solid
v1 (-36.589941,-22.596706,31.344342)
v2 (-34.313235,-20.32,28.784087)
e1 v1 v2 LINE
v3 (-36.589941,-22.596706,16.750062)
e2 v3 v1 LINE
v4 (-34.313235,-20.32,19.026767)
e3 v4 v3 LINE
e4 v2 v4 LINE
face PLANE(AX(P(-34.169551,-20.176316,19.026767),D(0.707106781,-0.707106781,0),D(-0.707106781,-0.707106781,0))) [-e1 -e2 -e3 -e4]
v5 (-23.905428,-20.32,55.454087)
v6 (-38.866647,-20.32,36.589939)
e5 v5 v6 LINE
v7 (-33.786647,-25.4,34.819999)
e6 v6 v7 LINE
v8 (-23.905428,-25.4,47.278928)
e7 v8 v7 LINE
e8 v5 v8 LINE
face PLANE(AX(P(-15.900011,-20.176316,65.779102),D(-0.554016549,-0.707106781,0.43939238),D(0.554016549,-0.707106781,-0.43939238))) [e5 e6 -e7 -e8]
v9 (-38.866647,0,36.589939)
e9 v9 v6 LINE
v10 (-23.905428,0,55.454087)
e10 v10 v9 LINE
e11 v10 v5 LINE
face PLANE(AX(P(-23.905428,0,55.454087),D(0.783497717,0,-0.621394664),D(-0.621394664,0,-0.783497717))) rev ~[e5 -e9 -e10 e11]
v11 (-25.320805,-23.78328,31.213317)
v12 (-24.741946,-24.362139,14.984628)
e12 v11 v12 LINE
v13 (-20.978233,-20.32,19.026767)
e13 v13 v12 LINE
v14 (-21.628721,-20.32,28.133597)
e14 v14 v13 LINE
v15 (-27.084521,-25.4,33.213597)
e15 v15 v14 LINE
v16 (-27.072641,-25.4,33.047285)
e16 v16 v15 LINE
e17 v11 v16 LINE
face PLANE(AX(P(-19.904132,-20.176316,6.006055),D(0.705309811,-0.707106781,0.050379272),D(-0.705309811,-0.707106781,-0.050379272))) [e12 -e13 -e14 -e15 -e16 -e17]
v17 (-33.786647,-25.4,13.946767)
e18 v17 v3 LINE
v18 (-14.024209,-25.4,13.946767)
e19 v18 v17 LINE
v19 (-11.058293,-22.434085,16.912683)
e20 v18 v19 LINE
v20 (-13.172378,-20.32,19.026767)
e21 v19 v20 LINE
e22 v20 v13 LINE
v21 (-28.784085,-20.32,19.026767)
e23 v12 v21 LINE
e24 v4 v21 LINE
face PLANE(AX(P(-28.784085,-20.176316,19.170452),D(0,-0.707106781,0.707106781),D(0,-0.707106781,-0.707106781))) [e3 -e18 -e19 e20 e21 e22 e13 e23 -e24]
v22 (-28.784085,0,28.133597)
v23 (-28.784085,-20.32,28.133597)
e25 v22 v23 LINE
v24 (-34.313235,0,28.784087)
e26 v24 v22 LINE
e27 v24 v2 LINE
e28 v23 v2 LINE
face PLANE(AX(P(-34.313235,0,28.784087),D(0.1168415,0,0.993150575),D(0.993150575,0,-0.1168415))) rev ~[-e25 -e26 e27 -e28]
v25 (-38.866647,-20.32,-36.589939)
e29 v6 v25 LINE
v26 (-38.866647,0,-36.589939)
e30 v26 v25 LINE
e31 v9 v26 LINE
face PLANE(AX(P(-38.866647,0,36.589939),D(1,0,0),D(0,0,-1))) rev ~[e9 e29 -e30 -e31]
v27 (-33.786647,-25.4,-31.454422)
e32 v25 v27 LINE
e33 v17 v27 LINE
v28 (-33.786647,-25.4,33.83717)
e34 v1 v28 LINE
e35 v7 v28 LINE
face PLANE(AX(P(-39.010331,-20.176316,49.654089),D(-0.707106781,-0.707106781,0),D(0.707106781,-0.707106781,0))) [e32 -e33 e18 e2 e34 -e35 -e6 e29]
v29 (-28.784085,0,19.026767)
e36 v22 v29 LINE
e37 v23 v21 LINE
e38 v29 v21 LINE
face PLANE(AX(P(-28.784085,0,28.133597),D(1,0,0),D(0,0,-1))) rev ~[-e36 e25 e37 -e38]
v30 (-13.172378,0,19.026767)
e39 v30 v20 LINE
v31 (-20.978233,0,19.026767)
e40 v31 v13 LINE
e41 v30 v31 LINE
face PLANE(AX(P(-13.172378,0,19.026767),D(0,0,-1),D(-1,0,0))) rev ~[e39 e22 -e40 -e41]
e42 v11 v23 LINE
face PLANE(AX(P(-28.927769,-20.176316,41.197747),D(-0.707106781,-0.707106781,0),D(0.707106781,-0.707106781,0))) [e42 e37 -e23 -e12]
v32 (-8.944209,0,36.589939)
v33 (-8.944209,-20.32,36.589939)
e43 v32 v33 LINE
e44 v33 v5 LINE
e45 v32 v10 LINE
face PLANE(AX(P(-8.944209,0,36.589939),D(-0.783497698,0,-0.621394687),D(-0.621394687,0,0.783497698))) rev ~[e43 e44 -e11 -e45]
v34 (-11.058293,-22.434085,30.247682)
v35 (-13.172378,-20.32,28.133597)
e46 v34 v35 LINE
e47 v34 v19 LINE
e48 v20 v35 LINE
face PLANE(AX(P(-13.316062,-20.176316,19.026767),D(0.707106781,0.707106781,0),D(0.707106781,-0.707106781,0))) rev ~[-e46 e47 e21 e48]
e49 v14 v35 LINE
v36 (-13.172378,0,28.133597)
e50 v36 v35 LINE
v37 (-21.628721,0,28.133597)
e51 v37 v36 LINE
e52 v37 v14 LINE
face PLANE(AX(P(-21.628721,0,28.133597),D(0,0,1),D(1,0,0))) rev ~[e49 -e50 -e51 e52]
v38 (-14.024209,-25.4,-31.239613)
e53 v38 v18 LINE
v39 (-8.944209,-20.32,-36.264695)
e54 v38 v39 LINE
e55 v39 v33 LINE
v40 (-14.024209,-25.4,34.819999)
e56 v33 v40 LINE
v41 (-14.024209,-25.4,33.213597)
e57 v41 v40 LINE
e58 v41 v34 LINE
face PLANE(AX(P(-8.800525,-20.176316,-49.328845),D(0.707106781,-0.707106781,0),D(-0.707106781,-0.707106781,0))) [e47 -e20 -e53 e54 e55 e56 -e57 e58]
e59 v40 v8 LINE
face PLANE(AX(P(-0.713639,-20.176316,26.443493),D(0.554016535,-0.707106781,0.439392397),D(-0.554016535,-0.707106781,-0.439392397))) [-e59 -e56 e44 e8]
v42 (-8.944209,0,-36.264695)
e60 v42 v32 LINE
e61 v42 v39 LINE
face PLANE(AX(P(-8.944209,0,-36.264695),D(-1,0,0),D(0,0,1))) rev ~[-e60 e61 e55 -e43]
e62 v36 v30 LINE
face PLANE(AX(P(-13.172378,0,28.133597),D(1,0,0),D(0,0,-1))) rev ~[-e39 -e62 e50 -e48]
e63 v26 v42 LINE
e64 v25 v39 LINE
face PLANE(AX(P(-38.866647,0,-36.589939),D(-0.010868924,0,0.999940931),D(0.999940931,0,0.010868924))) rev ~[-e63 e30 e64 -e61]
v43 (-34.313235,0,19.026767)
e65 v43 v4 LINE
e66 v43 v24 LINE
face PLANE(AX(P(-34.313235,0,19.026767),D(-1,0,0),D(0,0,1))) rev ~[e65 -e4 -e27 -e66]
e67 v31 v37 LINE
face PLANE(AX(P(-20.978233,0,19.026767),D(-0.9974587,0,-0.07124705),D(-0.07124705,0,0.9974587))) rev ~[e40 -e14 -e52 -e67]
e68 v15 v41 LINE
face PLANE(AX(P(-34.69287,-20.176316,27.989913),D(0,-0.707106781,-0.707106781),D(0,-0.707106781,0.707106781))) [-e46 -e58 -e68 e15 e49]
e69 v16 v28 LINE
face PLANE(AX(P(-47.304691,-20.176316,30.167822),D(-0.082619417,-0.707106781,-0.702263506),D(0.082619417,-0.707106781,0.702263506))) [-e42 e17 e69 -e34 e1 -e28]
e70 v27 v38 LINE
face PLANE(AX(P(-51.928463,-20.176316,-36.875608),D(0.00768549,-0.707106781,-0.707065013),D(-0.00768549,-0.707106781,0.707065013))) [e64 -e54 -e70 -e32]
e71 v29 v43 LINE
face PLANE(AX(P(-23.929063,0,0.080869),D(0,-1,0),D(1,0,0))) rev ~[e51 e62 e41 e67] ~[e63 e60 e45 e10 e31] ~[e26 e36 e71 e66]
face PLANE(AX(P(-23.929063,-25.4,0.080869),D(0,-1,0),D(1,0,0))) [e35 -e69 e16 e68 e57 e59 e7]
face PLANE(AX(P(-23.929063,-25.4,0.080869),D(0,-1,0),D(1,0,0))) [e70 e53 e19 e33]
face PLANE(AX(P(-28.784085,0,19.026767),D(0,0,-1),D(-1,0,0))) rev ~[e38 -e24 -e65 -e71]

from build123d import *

# Parameters (mm, degrees)
F1_DEPTH      = 25.4
F2_T1_DEPTH   = 5.5291503668
F2_T3_DEPTH   = 9.1068297625
F2_T8_DEPTH   = 98.9829335321
F2_T14_DEPTH  = 50.2051374371
F2_T20_DEPTH  = 50.2051368583
F2_T26_DEPTH  = 99.3081774522
F2_T32_DEPTH  = 56.0525045898
F2_T38_DEPTH  = 22.8214690441
F2_T43_DEPTH  = 31.6955822143
F2_T49_DEPTH  = 22.1709793413
F2_T54_DEPTH  = 35.2583310718
F2_T60_DEPTH  = 21.5204924325
F2_T65_DEPTH  = 20.8700045923
F2_T71_DEPTH  = 98.9829335321
F2_T75_DEPTH  = 56.0525045898
F2_T82_DEPTH  = 98.9829335321
F2_T86_DEPTH  = 50.2051374371
F2_T93_DEPTH  = 50.2051374371
F2_T97_DEPTH  = 50.2051368583
F2_T104_DEPTH = 50.2051368583
F2_T108_DEPTH = 99.3081774522
F2_T115_DEPTH = 99.3081774522
F2_T119_DEPTH = 56.0525045898
F2_T126_DEPTH = 35.885618623
F2_T130_DEPTH = 18.5932999456
F2_T137_DEPTH = 22.8214690441
F2_T141_DEPTH = 31.6955822143
F2_T148_DEPTH = 31.6955822143
F2_T152_DEPTH = 22.1709793413
F2_T159_DEPTH = 35.2351289202
F2_T163_DEPTH = 18.5932999456
F2_T170_DEPTH = 35.2583310718
F2_T174_DEPTH = 20.8700045923
F2_T181_DEPTH = 35.2583310718
F2_T185_DEPTH = 21.5204924325
F2_T192_DEPTH = 34.5846420113
F2_T196_DEPTH = 22.1709793413
F2_T203_DEPTH = 22.1709793413
F2_T207_DEPTH = 33.9341541712
F3_R          = 2.4287646607
F4_DEPTH      = 25.4


# Not quite as in the source:
# - a fillet or chamfer that OpenCascade refuses, or shapes differently, is made with other operations: its cross-section is extruded or revolved along the edge and cut away or added


with BuildPart() as f1:
    # F0 (on Front) → F1 (new body)
    with BuildSketch(Plane.XZ):
        Polygon((-38.8666465878, 36.5899391472), (-38.8666465878, -36.5899391472), (-8.9442087337, -36.2646952271), (-8.9442087337, 36.5899391472), align=None)
        Polygon((-34.3132354319, 19.0267674625), (-34.3132354319, 28.7840869278), (-28.7840850651, 28.133597225), (-28.7840850651, 19.0267674625), align=None, mode=Mode.SUBTRACT)
        Polygon((-20.9782328457, 19.0267674625), (-21.6287206858, 28.133597225), (-13.1723778322, 28.133597225), (-13.1723778322, 19.0267674625), align=None, mode=Mode.SUBTRACT)
        Polygon((-23.9054281265, 55.4540865123), (-38.8666465878, 36.5899391472), (-8.9442087337, 36.5899391472), align=None)
    extrude(amount=F1_DEPTH)

    # F2: chamfer of 5.08 on 13 edges, made by hand

    # F2_s2 → F2_t1 (cut)
    with BuildSketch(Plane.YZ.offset(-34.3132354319)):
        with BuildLine():
            Line((-20.1763159021, 19.1704515604), (-25.5436840979, 13.8030833646))
            Line((-25.5436840979, 13.8030833646), (-25.6452840979, 13.8030833646))
            ThreePointArc((-25.6452840979, 13.8030833646), (-25.5016, 16.4149254135), (-25.5016, 19.0267674625))
            Line((-25.5016, 19.0267674625), (-25.4, 19.1283674625))
            ThreePointArc((-25.4, 19.1283674625), (-22.788157951, 19.1283674625), (-20.1763159021, 19.2720515604))
            Line((-20.1763159021, 19.2720515604), (-20.1763159021, 19.1704515604))
        make_face()
    extrude(amount=F2_T1_DEPTH, mode=Mode.SUBTRACT)

    # F2_s4 → F2_t3 (cut)
    with BuildSketch(Plane.XY.offset(19.0267674625)):
        with BuildLine():
            Line((-13.3160619302, -20.1763159021), (-7.9486937343, -25.5436840979))
            Line((-7.9486937343, -25.5436840979), (-7.9486937343, -25.6452840979))
            ThreePointArc((-7.9486937343, -25.6452840979), (-10.5605357833, -25.5016), (-13.1723778322, -25.5016))
            Line((-13.1723778322, -25.5016), (-13.2739778322, -25.4))
            ThreePointArc((-13.2739778322, -25.4), (-13.2739778322, -22.788157951), (-13.4176619302, -20.1763159021))
            Line((-13.4176619302, -20.1763159021), (-13.3160619302, -20.1763159021))
        make_face()
    extrude(amount=F2_T3_DEPTH, mode=Mode.SUBTRACT)


with BuildPart() as f2_tool6:
    # F2_s7 → F2_t8 (new body)
    with BuildSketch(Plane.XY.offset(-49.328844806)):
        with BuildLine():
            Line((-8.8005246358, -20.1763159021), (-14.1678928317, -25.5436840979))
            Line((-14.1678928317, -25.5436840979), (-14.1678928317, -25.6452840979))
            ThreePointArc((-14.1678928317, -25.6452840979), (-11.5560507827, -25.5016), (-8.9442087337, -25.5016))
            Line((-8.9442087337, -25.5016), (-8.8426087337, -25.4))
            ThreePointArc((-8.8426087337, -25.4), (-8.8426087337, -22.788157951), (-8.6989246358, -20.1763159021))
            Line((-8.6989246358, -20.1763159021), (-8.8005246358, -20.1763159021))
        make_face()
    extrude(amount=F2_T8_DEPTH)

    split(bisect_by=Plane(origin=(0.3930783298, 0, -36.163202967), x_dir=(0, 1, 0), z_dir=(-0.0108689242, 0, 0.9999409315)), keep=Keep.TOP)

    split(bisect_by=Plane(origin=(12.3236563201, 0, 9.7739337144), x_dir=(0, 1, 0), z_dir=(-0.7834976979, 0, -0.6213946873)), keep=Keep.TOP)


with BuildPart() as f1_1:
    add(f1.part)

    # F2_t5: cut F2_tool6
    add(f2_tool6.part, mode=Mode.SUBTRACT)


with BuildPart() as f2_tool12:
    # F2_s13 → F2_t14 (new body)
    with BuildSketch(Plane(origin=(-13.149871912, 0, 16.5802743125), x_dir=(0, 1, 0), z_dir=(-0.6213946873, 0, 0.7834976979))):
        with BuildLine():
            Line((-20.1763159021, -15.8727109385), (-25.5436840979, -10.5053427426))
            Line((-25.5436840979, -10.5053427426), (-25.6452840979, -10.5053427426))
            ThreePointArc((-25.6452840979, -10.5053427426), (-25.5016, -13.1171847916), (-25.5016, -15.7290268405))
            Line((-25.5016, -15.7290268405), (-25.4, -15.8306268405))
            ThreePointArc((-25.4, -15.8306268405), (-22.788157951, -15.8306268405), (-20.1763159021, -15.9743109385))
            Line((-20.1763159021, -15.9743109385), (-20.1763159021, -15.8727109385))
        make_face()
    extrude(amount=F2_T14_DEPTH)

    split(bisect_by=Plane.YZ.offset(-8.9442087337), keep=Keep.BOTTOM)

    split(bisect_by=Plane(origin=(-41.6732420747, 0, 33.0511878754), x_dir=(0, 1, 0), z_dir=(0.7834977168, 0, -0.6213946635)), keep=Keep.TOP)


with BuildPart() as f1_2:
    add(f1_1.part)

    # F2_t11: cut F2_tool12
    add(f2_tool12.part, mode=Mode.SUBTRACT)


with BuildPart() as f2_tool18:
    # F2_s19 → F2_t20 (new body)
    with BuildSketch(Plane(origin=(25.8858067798, 0, 32.6386300033), x_dir=(0, 1, 0), z_dir=(-0.6213946635, 0, -0.7834977168))):
        with BuildLine():
            Line((-20.1763159021, -53.3324058817), (-25.5436840979, -47.9650376858))
            Line((-25.5436840979, -47.9650376858), (-25.6452840979, -47.9650376858))
            ThreePointArc((-25.6452840979, -47.9650376858), (-25.5016, -50.5768797348), (-25.5016, -53.1887217838))
            Line((-25.5016, -53.1887217838), (-25.4, -53.2903217838))
            ThreePointArc((-25.4, -53.2903217838), (-22.788157951, -53.2903217838), (-20.1763159021, -53.4340058817))
            Line((-20.1763159021, -53.4340058817), (-20.1763159021, -53.3324058817))
        make_face()
    extrude(amount=F2_T20_DEPTH)

    split(bisect_by=Plane(origin=(12.3236563201, 0, 9.7739337144), x_dir=(0, 1, 0), z_dir=(-0.7834976979, 0, -0.6213946873)), keep=Keep.TOP)

    split(bisect_by=Plane.YZ.offset(-38.8666465878), keep=Keep.TOP)


with BuildPart() as f1_3:
    add(f1_2.part)

    # F2_t17: cut F2_tool18
    add(f2_tool18.part, mode=Mode.SUBTRACT)


with BuildPart() as f2_tool24:
    # F2_s25 → F2_t26 (new body)
    with BuildSketch(Plane.XY.offset(49.6540887261)):
        with BuildLine():
            Line((-39.0103306858, -20.1763159021), (-33.6429624899, -25.5436840979))
            Line((-33.6429624899, -25.5436840979), (-33.6429624899, -25.6452840979))
            ThreePointArc((-33.6429624899, -25.6452840979), (-36.2548045389, -25.5016), (-38.8666465878, -25.5016))
            Line((-38.8666465878, -25.5016), (-38.9682465878, -25.4))
            ThreePointArc((-38.9682465878, -25.4), (-38.9682465878, -22.788157951), (-39.1119306858, -20.1763159021))
            Line((-39.1119306858, -20.1763159021), (-39.0103306858, -20.1763159021))
        make_face()
    extrude(amount=-F2_T26_DEPTH)

    split(bisect_by=Plane(origin=(-41.6732420747, 0, 33.0511878754), x_dir=(0, 1, 0), z_dir=(0.7834977168, 0, -0.6213946635)), keep=Keep.TOP)

    split(bisect_by=Plane(origin=(0.3930783298, 0, -36.163202967), x_dir=(0, 1, 0), z_dir=(-0.0108689242, 0, 0.9999409315)), keep=Keep.TOP)


with BuildPart() as f1_4:
    add(f1_3.part)

    # F2_t23: cut F2_tool24
    add(f2_tool24.part, mode=Mode.SUBTRACT)


with BuildPart() as f2_tool30:
    # F2_s31 → F2_t32 (new body)
    with BuildSketch(Plane(origin=(-52.3231028168, 0, -0.5687294315), x_dir=(0, 1, 0), z_dir=(0.9999409315, 0, 0.0108689242))):
        with BuildLine():
            Line((-20.1763159021, -36.3090232973), (-25.5436840979, -30.9416551014))
            Line((-25.5436840979, -30.9416551014), (-25.6452840979, -30.9416551014))
            ThreePointArc((-25.6452840979, -30.9416551014), (-25.5016, -33.5534971504), (-25.5016, -36.1653391994))
            Line((-25.5016, -36.1653391994), (-25.4, -36.2669391994))
            ThreePointArc((-25.4, -36.2669391994), (-22.788157951, -36.2669391994), (-20.1763159021, -36.4106232973))
            Line((-20.1763159021, -36.4106232973), (-20.1763159021, -36.3090232973))
        make_face()
    extrude(amount=F2_T32_DEPTH)

    split(bisect_by=Plane.YZ.offset(-8.9442087337), keep=Keep.BOTTOM)

    split(bisect_by=Plane.YZ.offset(-38.8666465878), keep=Keep.TOP)


with BuildPart() as f1_5:
    add(f1_4.part)

    # F2_t29: cut F2_tool30
    add(f2_tool30.part, mode=Mode.SUBTRACT)


with BuildPart() as f2_tool36:
    # F2_s37 → F2_t38 (new body)
    with BuildSketch(Plane.XY.offset(19.0267674625)):
        with BuildLine():
            Line((-34.169551334, -20.1763159021), (-39.5369195298, -25.5436840979))
            Line((-39.5369195298, -25.5436840979), (-39.5369195298, -25.6452840979))
            ThreePointArc((-39.5369195298, -25.6452840979), (-36.9250774809, -25.5016), (-34.3132354319, -25.5016))
            Line((-34.3132354319, -25.5016), (-34.2116354319, -25.4))
            ThreePointArc((-34.2116354319, -25.4), (-34.2116354319, -22.788157951), (-34.067951334, -20.1763159021))
            Line((-34.067951334, -20.1763159021), (-34.169551334, -20.1763159021))
        make_face()
    extrude(amount=F2_T38_DEPTH)

    split(bisect_by=Plane(origin=(2.8716979706, 0, 24.4093793011), x_dir=(0, 1, 0), z_dir=(-0.1168414999, 0, -0.9931505746)), keep=Keep.TOP)


with BuildPart() as f1_6:
    add(f1_5.part)

    # F2_t35: cut F2_tool36
    add(f2_tool36.part, mode=Mode.SUBTRACT)


with BuildPart() as f2_tool41:
    # F2_s42 → F2_t43 (new body)
    with BuildSketch(Plane(origin=(-50.1596010639, 0, 5.9011424586), x_dir=(0, 1, 0), z_dir=(0.9931505746, 0, -0.1168414999))):
        with BuildLine():
            Line((-20.1763159021, 24.4340384796), (-25.5436840979, 29.8014066755))
            Line((-25.5436840979, 29.8014066755), (-25.6452840979, 29.8014066755))
            ThreePointArc((-25.6452840979, 29.8014066755), (-25.5016, 27.1895646266), (-25.5016, 24.5777225776))
            Line((-25.5016, 24.5777225776), (-25.4, 24.4761225776))
            ThreePointArc((-25.4, 24.4761225776), (-22.788157951, 24.4761225776), (-20.1763159021, 24.3324384796))
            Line((-20.1763159021, 24.3324384796), (-20.1763159021, 24.4340384796))
        make_face()
    extrude(amount=F2_T43_DEPTH)

    split(bisect_by=Plane.YZ.offset(-34.3132354319), keep=Keep.TOP)

    split(bisect_by=Plane.YZ.offset(-28.7840850651), keep=Keep.BOTTOM)


with BuildPart() as f1_7:
    add(f1_6.part)

    # F2_t40: cut F2_tool41
    add(f2_tool41.part, mode=Mode.SUBTRACT)


with BuildPart() as f2_tool47:
    # F2_s48 → F2_t49 (new body)
    with BuildSketch(Plane.XY.offset(41.1977468038)):
        with BuildLine():
            Line((-28.9277691631, -20.1763159021), (-23.5604009672, -25.5436840979))
            Line((-23.5604009672, -25.5436840979), (-23.5604009672, -25.6452840979))
            ThreePointArc((-23.5604009672, -25.6452840979), (-26.1722430162, -25.5016), (-28.7840850651, -25.5016))
            Line((-28.7840850651, -25.5016), (-28.8856850651, -25.4))
            ThreePointArc((-28.8856850651, -25.4), (-28.8856850651, -22.788157951), (-29.0293691631, -20.1763159021))
            Line((-29.0293691631, -20.1763159021), (-28.9277691631, -20.1763159021))
        make_face()
    extrude(amount=-F2_T49_DEPTH)

    split(bisect_by=Plane(origin=(2.8716979706, 0, 24.4093793011), x_dir=(0, 1, 0), z_dir=(-0.1168414999, 0, -0.9931505746)), keep=Keep.TOP)


with BuildPart() as f1_8:
    add(f1_7.part)

    # F2_t46: cut F2_tool47
    add(f2_tool47.part, mode=Mode.SUBTRACT)


with BuildPart() as f2_tool52:
    # F2_s53 → F2_t54 (new body)
    with BuildSketch(Plane(origin=(-0.5278624368, 0, 7.3900741156), x_dir=(0, 1, 0), z_dir=(-0.07124705, 0, 0.9974586998))):
        with BuildLine():
            Line((-20.1763159021, 19.4256357085), (-25.5436840979, 24.7930039044))
            Line((-25.5436840979, 24.7930039044), (-25.6452840979, 24.7930039044))
            ThreePointArc((-25.6452840979, 24.7930039044), (-25.5016, 22.1811618554), (-25.5016, 19.5693198065))
            Line((-25.5016, 19.5693198065), (-25.4, 19.4677198065))
            ThreePointArc((-25.4, 19.4677198065), (-22.788157951, 19.4677198065), (-20.1763159021, 19.3240357085))
            Line((-20.1763159021, 19.3240357085), (-20.1763159021, 19.4256357085))
        make_face()
    extrude(amount=F2_T54_DEPTH)

    split(bisect_by=Plane.XY.offset(19.0267674625), keep=Keep.TOP)

    split(bisect_by=Plane.XY.offset(28.133597225), keep=Keep.BOTTOM)


with BuildPart() as f1_9:
    add(f1_8.part)

    # F2_t51: cut F2_tool52
    add(f2_tool52.part, mode=Mode.SUBTRACT)


with BuildPart() as f2_tool58:
    # F2_s59 → F2_t60 (new body)
    with BuildSketch(Plane.YZ.offset(-34.6928702647)):
        with BuildLine():
            Line((-20.1763159021, 27.989913127), (-25.5436840979, 33.3572813229))
            Line((-25.5436840979, 33.3572813229), (-25.6452840979, 33.3572813229))
            ThreePointArc((-25.6452840979, 33.3572813229), (-25.5016, 30.7454392739), (-25.5016, 28.133597225))
            Line((-25.5016, 28.133597225), (-25.4, 28.031997225))
            ThreePointArc((-25.4, 28.031997225), (-22.788157951, 28.031997225), (-20.1763159021, 27.888313127))
            Line((-20.1763159021, 27.888313127), (-20.1763159021, 27.989913127))
        make_face()
    extrude(amount=F2_T60_DEPTH)

    split(bisect_by=Plane(origin=(-19.5195882907, 0, -1.3942563065), x_dir=(0, 1, 0), z_dir=(0.9974586998, 0, 0.07124705)), keep=Keep.TOP)


with BuildPart() as f1_10:
    add(f1_9.part)

    # F2_t57: cut F2_tool58
    add(f2_tool58.part, mode=Mode.SUBTRACT)


with BuildPart() as f2_tool63:
    # F2_s64 → F2_t65 (new body)
    with BuildSketch(Plane.YZ.offset(-13.1723778322)):
        with BuildLine():
            Line((-20.1763159021, 19.1704515604), (-25.5436840979, 13.8030833646))
            Line((-25.5436840979, 13.8030833646), (-25.6452840979, 13.8030833646))
            ThreePointArc((-25.6452840979, 13.8030833646), (-25.5016, 16.4149254135), (-25.5016, 19.0267674625))
            Line((-25.5016, 19.0267674625), (-25.4, 19.1283674625))
            ThreePointArc((-25.4, 19.1283674625), (-22.788157951, 19.1283674625), (-20.1763159021, 19.2720515604))
            Line((-20.1763159021, 19.2720515604), (-20.1763159021, 19.1704515604))
        make_face()
    extrude(amount=-F2_T65_DEPTH)

    split(bisect_by=Plane(origin=(-19.5195882907, 0, -1.3942563065), x_dir=(0, 1, 0), z_dir=(0.9974586998, 0, 0.07124705)), keep=Keep.TOP)


with BuildPart() as f1_11:
    add(f1_10.part)

    # F2_t62: cut F2_tool63
    add(f2_tool63.part, mode=Mode.SUBTRACT)


with BuildPart() as f2_tool69:
    # F2_s70 → F2_t71 (new body)
    with BuildSketch(Plane.XY.offset(-49.328844806)):
        with BuildLine():
            Line((-8.8005246358, -20.1763159021), (-14.1678928317, -25.5436840979))
            Line((-14.1678928317, -25.5436840979), (-14.1678928317, -25.6452840979))
            ThreePointArc((-14.1678928317, -25.6452840979), (-11.5560507827, -25.5016), (-8.9442087337, -25.5016))
            Line((-8.9442087337, -25.5016), (-8.8426087337, -25.4))
            ThreePointArc((-8.8426087337, -25.4), (-8.8426087337, -22.788157951), (-8.6989246358, -20.1763159021))
            Line((-8.6989246358, -20.1763159021), (-8.8005246358, -20.1763159021))
        make_face()
    extrude(amount=F2_T71_DEPTH)

    split(bisect_by=Plane(origin=(0.3930783298, 0, -36.163202967), x_dir=(0, 1, 0), z_dir=(0.0108689242, 0, -0.9999409315)), keep=Keep.TOP)


with BuildPart() as f2_tool73:
    # F2_s74 → F2_t75 (new body)
    with BuildSketch(Plane(origin=(-52.3231028168, 0, -0.5687294315), x_dir=(0, 1, 0), z_dir=(0.9999409315, 0, 0.0108689242))):
        with BuildLine():
            Line((-20.1763159021, -36.3090232973), (-25.5436840979, -30.9416551014))
            Line((-25.5436840979, -30.9416551014), (-25.6452840979, -30.9416551014))
            ThreePointArc((-25.6452840979, -30.9416551014), (-25.5016, -33.5534971504), (-25.5016, -36.1653391994))
            Line((-25.5016, -36.1653391994), (-25.4, -36.2669391994))
            ThreePointArc((-25.4, -36.2669391994), (-22.788157951, -36.2669391994), (-20.1763159021, -36.4106232973))
            Line((-20.1763159021, -36.4106232973), (-20.1763159021, -36.3090232973))
        make_face()
    extrude(amount=F2_T75_DEPTH)

    split(bisect_by=Plane.YZ.offset(-8.9442087337), keep=Keep.TOP)


with BuildPart() as f2_tool69_1:
    add(f2_tool69.part)

    # F2_t77: intersect F2_tool73
    add(f2_tool73.part, mode=Mode.INTERSECT)


with BuildPart() as f1_12:
    add(f1_11.part)

    # F2_t67: cut F2_tool69
    add(f2_tool69_1.part, mode=Mode.SUBTRACT)


with BuildPart() as f2_tool80:
    # F2_s81 → F2_t82 (new body)
    with BuildSketch(Plane.XY.offset(-49.328844806)):
        with BuildLine():
            Line((-8.8005246358, -20.1763159021), (-14.1678928317, -25.5436840979))
            Line((-14.1678928317, -25.5436840979), (-14.1678928317, -25.6452840979))
            ThreePointArc((-14.1678928317, -25.6452840979), (-11.5560507827, -25.5016), (-8.9442087337, -25.5016))
            Line((-8.9442087337, -25.5016), (-8.8426087337, -25.4))
            ThreePointArc((-8.8426087337, -25.4), (-8.8426087337, -22.788157951), (-8.6989246358, -20.1763159021))
            Line((-8.6989246358, -20.1763159021), (-8.8005246358, -20.1763159021))
        make_face()
    extrude(amount=F2_T82_DEPTH)

    split(bisect_by=Plane(origin=(12.3236563201, 0, 9.7739337144), x_dir=(0, 1, 0), z_dir=(0.7834976979, 0, 0.6213946873)), keep=Keep.TOP)


with BuildPart() as f2_tool84:
    # F2_s85 → F2_t86 (new body)
    with BuildSketch(Plane(origin=(-13.149871912, 0, 16.5802743125), x_dir=(0, 1, 0), z_dir=(-0.6213946873, 0, 0.7834976979))):
        with BuildLine():
            Line((-20.1763159021, -15.8727109385), (-25.5436840979, -10.5053427426))
            Line((-25.5436840979, -10.5053427426), (-25.6452840979, -10.5053427426))
            ThreePointArc((-25.6452840979, -10.5053427426), (-25.5016, -13.1171847916), (-25.5016, -15.7290268405))
            Line((-25.5016, -15.7290268405), (-25.4, -15.8306268405))
            ThreePointArc((-25.4, -15.8306268405), (-22.788157951, -15.8306268405), (-20.1763159021, -15.9743109385))
            Line((-20.1763159021, -15.9743109385), (-20.1763159021, -15.8727109385))
        make_face()
    extrude(amount=F2_T86_DEPTH)

    split(bisect_by=Plane.YZ.offset(-8.9442087337), keep=Keep.TOP)


with BuildPart() as f2_tool80_1:
    add(f2_tool80.part)

    # F2_t88: intersect F2_tool84
    add(f2_tool84.part, mode=Mode.INTERSECT)


with BuildPart() as f1_13:
    add(f1_12.part)

    # F2_t78: cut F2_tool80
    add(f2_tool80_1.part, mode=Mode.SUBTRACT)


with BuildPart() as f2_tool91:
    # F2_s92 → F2_t93 (new body)
    with BuildSketch(Plane(origin=(-13.149871912, 0, 16.5802743125), x_dir=(0, 1, 0), z_dir=(-0.6213946873, 0, 0.7834976979))):
        with BuildLine():
            Line((-20.1763159021, -15.8727109385), (-25.5436840979, -10.5053427426))
            Line((-25.5436840979, -10.5053427426), (-25.6452840979, -10.5053427426))
            ThreePointArc((-25.6452840979, -10.5053427426), (-25.5016, -13.1171847916), (-25.5016, -15.7290268405))
            Line((-25.5016, -15.7290268405), (-25.4, -15.8306268405))
            ThreePointArc((-25.4, -15.8306268405), (-22.788157951, -15.8306268405), (-20.1763159021, -15.9743109385))
            Line((-20.1763159021, -15.9743109385), (-20.1763159021, -15.8727109385))
        make_face()
    extrude(amount=F2_T93_DEPTH)

    split(bisect_by=Plane(origin=(-41.6732420747, 0, 33.0511878754), x_dir=(0, 1, 0), z_dir=(-0.7834977168, 0, 0.6213946635)), keep=Keep.TOP)


with BuildPart() as f2_tool95:
    # F2_s96 → F2_t97 (new body)
    with BuildSketch(Plane(origin=(25.8858067798, 0, 32.6386300033), x_dir=(0, 1, 0), z_dir=(-0.6213946635, 0, -0.7834977168))):
        with BuildLine():
            Line((-20.1763159021, -53.3324058817), (-25.5436840979, -47.9650376858))
            Line((-25.5436840979, -47.9650376858), (-25.6452840979, -47.9650376858))
            ThreePointArc((-25.6452840979, -47.9650376858), (-25.5016, -50.5768797348), (-25.5016, -53.1887217838))
            Line((-25.5016, -53.1887217838), (-25.4, -53.2903217838))
            ThreePointArc((-25.4, -53.2903217838), (-22.788157951, -53.2903217838), (-20.1763159021, -53.4340058817))
            Line((-20.1763159021, -53.4340058817), (-20.1763159021, -53.3324058817))
        make_face()
    extrude(amount=F2_T97_DEPTH)

    split(bisect_by=Plane(origin=(12.3236563201, 0, 9.7739337144), x_dir=(0, 1, 0), z_dir=(0.7834976979, 0, 0.6213946873)), keep=Keep.TOP)


with BuildPart() as f2_tool91_1:
    add(f2_tool91.part)

    # F2_t99: intersect F2_tool95
    add(f2_tool95.part, mode=Mode.INTERSECT)


with BuildPart() as f1_14:
    add(f1_13.part)

    # F2_t89: cut F2_tool91
    add(f2_tool91_1.part, mode=Mode.SUBTRACT)


with BuildPart() as f2_tool102:
    # F2_s103 → F2_t104 (new body)
    with BuildSketch(Plane(origin=(25.8858067798, 0, 32.6386300033), x_dir=(0, 1, 0), z_dir=(-0.6213946635, 0, -0.7834977168))):
        with BuildLine():
            Line((-20.1763159021, -53.3324058817), (-25.5436840979, -47.9650376858))
            Line((-25.5436840979, -47.9650376858), (-25.6452840979, -47.9650376858))
            ThreePointArc((-25.6452840979, -47.9650376858), (-25.5016, -50.5768797348), (-25.5016, -53.1887217838))
            Line((-25.5016, -53.1887217838), (-25.4, -53.2903217838))
            ThreePointArc((-25.4, -53.2903217838), (-22.788157951, -53.2903217838), (-20.1763159021, -53.4340058817))
            Line((-20.1763159021, -53.4340058817), (-20.1763159021, -53.3324058817))
        make_face()
    extrude(amount=F2_T104_DEPTH)

    split(bisect_by=Plane.YZ.offset(-38.8666465878), keep=Keep.BOTTOM)


with BuildPart() as f2_tool106:
    # F2_s107 → F2_t108 (new body)
    with BuildSketch(Plane.XY.offset(49.6540887261)):
        with BuildLine():
            Line((-39.0103306858, -20.1763159021), (-33.6429624899, -25.5436840979))
            Line((-33.6429624899, -25.5436840979), (-33.6429624899, -25.6452840979))
            ThreePointArc((-33.6429624899, -25.6452840979), (-36.2548045389, -25.5016), (-38.8666465878, -25.5016))
            Line((-38.8666465878, -25.5016), (-38.9682465878, -25.4))
            ThreePointArc((-38.9682465878, -25.4), (-38.9682465878, -22.788157951), (-39.1119306858, -20.1763159021))
            Line((-39.1119306858, -20.1763159021), (-39.0103306858, -20.1763159021))
        make_face()
    extrude(amount=-F2_T108_DEPTH)

    split(bisect_by=Plane(origin=(-41.6732420747, 0, 33.0511878754), x_dir=(0, 1, 0), z_dir=(-0.7834977168, 0, 0.6213946635)), keep=Keep.TOP)


with BuildPart() as f2_tool102_1:
    add(f2_tool102.part)

    # F2_t110: intersect F2_tool106
    add(f2_tool106.part, mode=Mode.INTERSECT)


with BuildPart() as f1_15:
    add(f1_14.part)

    # F2_t100: cut F2_tool102
    add(f2_tool102_1.part, mode=Mode.SUBTRACT)


with BuildPart() as f2_tool113:
    # F2_s114 → F2_t115 (new body)
    with BuildSketch(Plane.XY.offset(49.6540887261)):
        with BuildLine():
            Line((-39.0103306858, -20.1763159021), (-33.6429624899, -25.5436840979))
            Line((-33.6429624899, -25.5436840979), (-33.6429624899, -25.6452840979))
            ThreePointArc((-33.6429624899, -25.6452840979), (-36.2548045389, -25.5016), (-38.8666465878, -25.5016))
            Line((-38.8666465878, -25.5016), (-38.9682465878, -25.4))
            ThreePointArc((-38.9682465878, -25.4), (-38.9682465878, -22.788157951), (-39.1119306858, -20.1763159021))
            Line((-39.1119306858, -20.1763159021), (-39.0103306858, -20.1763159021))
        make_face()
    extrude(amount=-F2_T115_DEPTH)

    split(bisect_by=Plane(origin=(0.3930783298, 0, -36.163202967), x_dir=(0, 1, 0), z_dir=(0.0108689242, 0, -0.9999409315)), keep=Keep.TOP)


with BuildPart() as f2_tool117:
    # F2_s118 → F2_t119 (new body)
    with BuildSketch(Plane(origin=(-52.3231028168, 0, -0.5687294315), x_dir=(0, 1, 0), z_dir=(0.9999409315, 0, 0.0108689242))):
        with BuildLine():
            Line((-20.1763159021, -36.3090232973), (-25.5436840979, -30.9416551014))
            Line((-25.5436840979, -30.9416551014), (-25.6452840979, -30.9416551014))
            ThreePointArc((-25.6452840979, -30.9416551014), (-25.5016, -33.5534971504), (-25.5016, -36.1653391994))
            Line((-25.5016, -36.1653391994), (-25.4, -36.2669391994))
            ThreePointArc((-25.4, -36.2669391994), (-22.788157951, -36.2669391994), (-20.1763159021, -36.4106232973))
            Line((-20.1763159021, -36.4106232973), (-20.1763159021, -36.3090232973))
        make_face()
    extrude(amount=F2_T119_DEPTH)

    split(bisect_by=Plane.YZ.offset(-38.8666465878), keep=Keep.BOTTOM)


with BuildPart() as f2_tool113_1:
    add(f2_tool113.part)

    # F2_t121: intersect F2_tool117
    add(f2_tool117.part, mode=Mode.INTERSECT)


with BuildPart() as f1_16:
    add(f1_15.part)

    # F2_t111: cut F2_tool113
    add(f2_tool113_1.part, mode=Mode.SUBTRACT)


with BuildPart() as f2_tool124:
    # F2_s125 → F2_t126 (new body)
    with BuildSketch(Plane.XY.offset(5.9626178836)):
        with BuildLine():
            Line((-34.169551334, -20.1763159021), (-39.5369195298, -25.5436840979))
            Line((-39.5369195298, -25.5436840979), (-39.5369195298, -25.6452840979))
            ThreePointArc((-39.5369195298, -25.6452840979), (-36.9250774809, -25.5016), (-34.3132354319, -25.5016))
            Line((-34.3132354319, -25.5016), (-34.2116354319, -25.4))
            ThreePointArc((-34.2116354319, -25.4), (-34.2116354319, -22.788157951), (-34.067951334, -20.1763159021))
            Line((-34.067951334, -20.1763159021), (-34.169551334, -20.1763159021))
        make_face()
    extrude(amount=F2_T126_DEPTH)

    split(bisect_by=Plane.XY.offset(19.0267674625), keep=Keep.BOTTOM)


with BuildPart() as f2_tool128:
    # F2_s129 → F2_t130 (new body)
    with BuildSketch(Plane.YZ.offset(-28.7840850651)):
        with BuildLine():
            Line((-20.1763159021, 19.1704515604), (-25.5436840979, 13.8030833646))
            Line((-25.5436840979, 13.8030833646), (-25.6452840979, 13.8030833646))
            ThreePointArc((-25.6452840979, 13.8030833646), (-25.5016, 16.4149254135), (-25.5016, 19.0267674625))
            Line((-25.5016, 19.0267674625), (-25.4, 19.1283674625))
            ThreePointArc((-25.4, 19.1283674625), (-22.788157951, 19.1283674625), (-20.1763159021, 19.2720515604))
            Line((-20.1763159021, 19.2720515604), (-20.1763159021, 19.1704515604))
        make_face()
    extrude(amount=-F2_T130_DEPTH)

    split(bisect_by=Plane.YZ.offset(-34.3132354319), keep=Keep.BOTTOM)


with BuildPart() as f2_tool124_1:
    add(f2_tool124.part)

    # F2_t132: intersect F2_tool128
    add(f2_tool128.part, mode=Mode.INTERSECT)


with BuildPart() as f1_17:
    add(f1_16.part)

    # F2_t122: cut F2_tool124
    add(f2_tool124_1.part, mode=Mode.SUBTRACT)


with BuildPart() as f2_tool135:
    # F2_s136 → F2_t137 (new body)
    with BuildSketch(Plane.XY.offset(19.0267674625)):
        with BuildLine():
            Line((-34.169551334, -20.1763159021), (-39.5369195298, -25.5436840979))
            Line((-39.5369195298, -25.5436840979), (-39.5369195298, -25.6452840979))
            ThreePointArc((-39.5369195298, -25.6452840979), (-36.9250774809, -25.5016), (-34.3132354319, -25.5016))
            Line((-34.3132354319, -25.5016), (-34.2116354319, -25.4))
            ThreePointArc((-34.2116354319, -25.4), (-34.2116354319, -22.788157951), (-34.067951334, -20.1763159021))
            Line((-34.067951334, -20.1763159021), (-34.169551334, -20.1763159021))
        make_face()
    extrude(amount=F2_T137_DEPTH)

    split(bisect_by=Plane(origin=(2.8716979706, 0, 24.4093793011), x_dir=(0, 1, 0), z_dir=(0.1168414999, 0, 0.9931505746)), keep=Keep.TOP)


with BuildPart() as f2_tool139:
    # F2_s140 → F2_t141 (new body)
    with BuildSketch(Plane(origin=(-50.1596010639, 0, 5.9011424586), x_dir=(0, 1, 0), z_dir=(0.9931505746, 0, -0.1168414999))):
        with BuildLine():
            Line((-20.1763159021, 24.4340384796), (-25.5436840979, 29.8014066755))
            Line((-25.5436840979, 29.8014066755), (-25.6452840979, 29.8014066755))
            ThreePointArc((-25.6452840979, 29.8014066755), (-25.5016, 27.1895646266), (-25.5016, 24.5777225776))
            Line((-25.5016, 24.5777225776), (-25.4, 24.4761225776))
            ThreePointArc((-25.4, 24.4761225776), (-22.788157951, 24.4761225776), (-20.1763159021, 24.3324384796))
            Line((-20.1763159021, 24.3324384796), (-20.1763159021, 24.4340384796))
        make_face()
    extrude(amount=F2_T141_DEPTH)

    split(bisect_by=Plane.YZ.offset(-34.3132354319), keep=Keep.BOTTOM)


with BuildPart() as f2_tool135_1:
    add(f2_tool135.part)

    # F2_t143: intersect F2_tool139
    add(f2_tool139.part, mode=Mode.INTERSECT)


with BuildPart() as f1_18:
    add(f1_17.part)

    # F2_t133: cut F2_tool135
    add(f2_tool135_1.part, mode=Mode.SUBTRACT)


with BuildPart() as f2_tool146:
    # F2_s147 → F2_t148 (new body)
    with BuildSketch(Plane(origin=(-50.1596010639, 0, 5.9011424586), x_dir=(0, 1, 0), z_dir=(0.9931505746, 0, -0.1168414999))):
        with BuildLine():
            Line((-20.1763159021, 24.4340384796), (-25.5436840979, 29.8014066755))
            Line((-25.5436840979, 29.8014066755), (-25.6452840979, 29.8014066755))
            ThreePointArc((-25.6452840979, 29.8014066755), (-25.5016, 27.1895646266), (-25.5016, 24.5777225776))
            Line((-25.5016, 24.5777225776), (-25.4, 24.4761225776))
            ThreePointArc((-25.4, 24.4761225776), (-22.788157951, 24.4761225776), (-20.1763159021, 24.3324384796))
            Line((-20.1763159021, 24.3324384796), (-20.1763159021, 24.4340384796))
        make_face()
    extrude(amount=F2_T148_DEPTH)

    split(bisect_by=Plane.YZ.offset(-28.7840850651), keep=Keep.TOP)


with BuildPart() as f2_tool150:
    # F2_s151 → F2_t152 (new body)
    with BuildSketch(Plane.XY.offset(41.1977468038)):
        with BuildLine():
            Line((-28.9277691631, -20.1763159021), (-23.5604009672, -25.5436840979))
            Line((-23.5604009672, -25.5436840979), (-23.5604009672, -25.6452840979))
            ThreePointArc((-23.5604009672, -25.6452840979), (-26.1722430162, -25.5016), (-28.7840850651, -25.5016))
            Line((-28.7840850651, -25.5016), (-28.8856850651, -25.4))
            ThreePointArc((-28.8856850651, -25.4), (-28.8856850651, -22.788157951), (-29.0293691631, -20.1763159021))
            Line((-29.0293691631, -20.1763159021), (-28.9277691631, -20.1763159021))
        make_face()
    extrude(amount=-F2_T152_DEPTH)

    split(bisect_by=Plane(origin=(2.8716979706, 0, 24.4093793011), x_dir=(0, 1, 0), z_dir=(0.1168414999, 0, 0.9931505746)), keep=Keep.TOP)


with BuildPart() as f2_tool146_1:
    add(f2_tool146.part)

    # F2_t154: intersect F2_tool150
    add(f2_tool150.part, mode=Mode.INTERSECT)


with BuildPart() as f1_19:
    add(f1_18.part)

    # F2_t144: cut F2_tool146
    add(f2_tool146_1.part, mode=Mode.SUBTRACT)


with BuildPart() as f2_tool157:
    # F2_s158 → F2_t159 (new body)
    with BuildSketch(Plane.XY.offset(41.1977468038)):
        with BuildLine():
            Line((-28.9277691631, -20.1763159021), (-23.5604009672, -25.5436840979))
            Line((-23.5604009672, -25.5436840979), (-23.5604009672, -25.6452840979))
            ThreePointArc((-23.5604009672, -25.6452840979), (-26.1722430162, -25.5016), (-28.7840850651, -25.5016))
            Line((-28.7840850651, -25.5016), (-28.8856850651, -25.4))
            ThreePointArc((-28.8856850651, -25.4), (-28.8856850651, -22.788157951), (-29.0293691631, -20.1763159021))
            Line((-29.0293691631, -20.1763159021), (-28.9277691631, -20.1763159021))
        make_face()
    extrude(amount=-F2_T159_DEPTH)

    split(bisect_by=Plane.XY.offset(19.0267674625), keep=Keep.BOTTOM)


with BuildPart() as f2_tool161:
    # F2_s162 → F2_t163 (new body)
    with BuildSketch(Plane.YZ.offset(-15.7199354863)):
        with BuildLine():
            Line((-20.1763159021, 19.1704515604), (-25.5436840979, 13.8030833646))
            Line((-25.5436840979, 13.8030833646), (-25.6452840979, 13.8030833646))
            ThreePointArc((-25.6452840979, 13.8030833646), (-25.5016, 16.4149254135), (-25.5016, 19.0267674625))
            Line((-25.5016, 19.0267674625), (-25.4, 19.1283674625))
            ThreePointArc((-25.4, 19.1283674625), (-22.788157951, 19.1283674625), (-20.1763159021, 19.2720515604))
            Line((-20.1763159021, 19.2720515604), (-20.1763159021, 19.1704515604))
        make_face()
    extrude(amount=-F2_T163_DEPTH)

    split(bisect_by=Plane.YZ.offset(-28.7840850651), keep=Keep.TOP)


with BuildPart() as f2_tool157_1:
    add(f2_tool157.part)

    # F2_t165: intersect F2_tool161
    add(f2_tool161.part, mode=Mode.INTERSECT)


with BuildPart() as f1_20:
    add(f1_19.part)

    # F2_t155: cut F2_tool157
    add(f2_tool157_1.part, mode=Mode.SUBTRACT)


with BuildPart() as f2_tool168:
    # F2_s169 → F2_t170 (new body)
    with BuildSketch(Plane(origin=(-0.5278624368, 0, 7.3900741156), x_dir=(0, 1, 0), z_dir=(-0.07124705, 0, 0.9974586998))):
        with BuildLine():
            Line((-20.1763159021, 19.4256357085), (-25.5436840979, 24.7930039044))
            Line((-25.5436840979, 24.7930039044), (-25.6452840979, 24.7930039044))
            ThreePointArc((-25.6452840979, 24.7930039044), (-25.5016, 22.1811618554), (-25.5016, 19.5693198065))
            Line((-25.5016, 19.5693198065), (-25.4, 19.4677198065))
            ThreePointArc((-25.4, 19.4677198065), (-22.788157951, 19.4677198065), (-20.1763159021, 19.3240357085))
            Line((-20.1763159021, 19.3240357085), (-20.1763159021, 19.4256357085))
        make_face()
    extrude(amount=F2_T170_DEPTH)

    split(bisect_by=Plane.XY.offset(19.0267674625), keep=Keep.BOTTOM)


with BuildPart() as f2_tool172:
    # F2_s173 → F2_t174 (new body)
    with BuildSketch(Plane.YZ.offset(-13.1723778322)):
        with BuildLine():
            Line((-20.1763159021, 19.1704515604), (-25.5436840979, 13.8030833646))
            Line((-25.5436840979, 13.8030833646), (-25.6452840979, 13.8030833646))
            ThreePointArc((-25.6452840979, 13.8030833646), (-25.5016, 16.4149254135), (-25.5016, 19.0267674625))
            Line((-25.5016, 19.0267674625), (-25.4, 19.1283674625))
            ThreePointArc((-25.4, 19.1283674625), (-22.788157951, 19.1283674625), (-20.1763159021, 19.2720515604))
            Line((-20.1763159021, 19.2720515604), (-20.1763159021, 19.1704515604))
        make_face()
    extrude(amount=-F2_T174_DEPTH)

    split(bisect_by=Plane(origin=(-19.5195882907, 0, -1.3942563065), x_dir=(0, 1, 0), z_dir=(-0.9974586998, 0, -0.07124705)), keep=Keep.TOP)


with BuildPart() as f2_tool168_1:
    add(f2_tool168.part)

    # F2_t176: intersect F2_tool172
    add(f2_tool172.part, mode=Mode.INTERSECT)


with BuildPart() as f1_21:
    add(f1_20.part)

    # F2_t166: cut F2_tool168
    add(f2_tool168_1.part, mode=Mode.SUBTRACT)


with BuildPart() as f2_tool179:
    # F2_s180 → F2_t181 (new body)
    with BuildSketch(Plane(origin=(-0.5278624368, 0, 7.3900741156), x_dir=(0, 1, 0), z_dir=(-0.07124705, 0, 0.9974586998))):
        with BuildLine():
            Line((-20.1763159021, 19.4256357085), (-25.5436840979, 24.7930039044))
            Line((-25.5436840979, 24.7930039044), (-25.6452840979, 24.7930039044))
            ThreePointArc((-25.6452840979, 24.7930039044), (-25.5016, 22.1811618554), (-25.5016, 19.5693198065))
            Line((-25.5016, 19.5693198065), (-25.4, 19.4677198065))
            ThreePointArc((-25.4, 19.4677198065), (-22.788157951, 19.4677198065), (-20.1763159021, 19.3240357085))
            Line((-20.1763159021, 19.3240357085), (-20.1763159021, 19.4256357085))
        make_face()
    extrude(amount=F2_T181_DEPTH)

    split(bisect_by=Plane.XY.offset(28.133597225), keep=Keep.TOP)


with BuildPart() as f2_tool183:
    # F2_s184 → F2_t185 (new body)
    with BuildSketch(Plane.YZ.offset(-34.6928702647)):
        with BuildLine():
            Line((-20.1763159021, 27.989913127), (-25.5436840979, 33.3572813229))
            Line((-25.5436840979, 33.3572813229), (-25.6452840979, 33.3572813229))
            ThreePointArc((-25.6452840979, 33.3572813229), (-25.5016, 30.7454392739), (-25.5016, 28.133597225))
            Line((-25.5016, 28.133597225), (-25.4, 28.031997225))
            ThreePointArc((-25.4, 28.031997225), (-22.788157951, 28.031997225), (-20.1763159021, 27.888313127))
            Line((-20.1763159021, 27.888313127), (-20.1763159021, 27.989913127))
        make_face()
    extrude(amount=F2_T185_DEPTH)

    split(bisect_by=Plane(origin=(-19.5195882907, 0, -1.3942563065), x_dir=(0, 1, 0), z_dir=(-0.9974586998, 0, -0.07124705)), keep=Keep.TOP)


with BuildPart() as f2_tool179_1:
    add(f2_tool179.part)

    # F2_t187: intersect F2_tool183
    add(f2_tool183.part, mode=Mode.INTERSECT)


with BuildPart() as f1_22:
    add(f1_21.part)

    # F2_t177: cut F2_tool179
    add(f2_tool179_1.part, mode=Mode.SUBTRACT)


with BuildPart() as f2_tool190:
    # F2_s191 → F2_t192 (new body)
    with BuildSketch(Plane.YZ.offset(-34.6928702647)):
        with BuildLine():
            Line((-20.1763159021, 27.989913127), (-25.5436840979, 33.3572813229))
            Line((-25.5436840979, 33.3572813229), (-25.6452840979, 33.3572813229))
            ThreePointArc((-25.6452840979, 33.3572813229), (-25.5016, 30.7454392739), (-25.5016, 28.133597225))
            Line((-25.5016, 28.133597225), (-25.4, 28.031997225))
            ThreePointArc((-25.4, 28.031997225), (-22.788157951, 28.031997225), (-20.1763159021, 27.888313127))
            Line((-20.1763159021, 27.888313127), (-20.1763159021, 27.989913127))
        make_face()
    extrude(amount=F2_T192_DEPTH)

    split(bisect_by=Plane.YZ.offset(-13.1723778322), keep=Keep.TOP)


with BuildPart() as f2_tool194:
    # F2_s195 → F2_t196 (new body)
    with BuildSketch(Plane.XY.offset(41.1977468038)):
        with BuildLine():
            Line((-13.3160619302, -20.1763159021), (-7.9486937343, -25.5436840979))
            Line((-7.9486937343, -25.5436840979), (-7.9486937343, -25.6452840979))
            ThreePointArc((-7.9486937343, -25.6452840979), (-10.5605357833, -25.5016), (-13.1723778322, -25.5016))
            Line((-13.1723778322, -25.5016), (-13.2739778322, -25.4))
            ThreePointArc((-13.2739778322, -25.4), (-13.2739778322, -22.788157951), (-13.4176619302, -20.1763159021))
            Line((-13.4176619302, -20.1763159021), (-13.3160619302, -20.1763159021))
        make_face()
    extrude(amount=-F2_T196_DEPTH)

    split(bisect_by=Plane.XY.offset(28.133597225), keep=Keep.TOP)


with BuildPart() as f2_tool190_1:
    add(f2_tool190.part)

    # F2_t198: intersect F2_tool194
    add(f2_tool194.part, mode=Mode.INTERSECT)


with BuildPart() as f1_23:
    add(f1_22.part)

    # F2_t188: cut F2_tool190
    add(f2_tool190_1.part, mode=Mode.SUBTRACT)


with BuildPart() as f2_tool201:
    # F2_s202 → F2_t203 (new body)
    with BuildSketch(Plane.XY.offset(28.133597225)):
        with BuildLine():
            Line((-13.3160619302, -20.1763159021), (-7.9486937343, -25.5436840979))
            Line((-7.9486937343, -25.5436840979), (-7.9486937343, -25.6452840979))
            ThreePointArc((-7.9486937343, -25.6452840979), (-10.5605357833, -25.5016), (-13.1723778322, -25.5016))
            Line((-13.1723778322, -25.5016), (-13.2739778322, -25.4))
            ThreePointArc((-13.2739778322, -25.4), (-13.2739778322, -22.788157951), (-13.4176619302, -20.1763159021))
            Line((-13.4176619302, -20.1763159021), (-13.3160619302, -20.1763159021))
        make_face()
    extrude(amount=-F2_T203_DEPTH)

    split(bisect_by=Plane.XY.offset(19.0267674625), keep=Keep.BOTTOM)


with BuildPart() as f2_tool205:
    # F2_s206 → F2_t207 (new body)
    with BuildSketch(Plane.YZ.offset(-0.1082282534)):
        with BuildLine():
            Line((-20.1763159021, 19.1704515604), (-25.5436840979, 13.8030833646))
            Line((-25.5436840979, 13.8030833646), (-25.6452840979, 13.8030833646))
            ThreePointArc((-25.6452840979, 13.8030833646), (-25.5016, 16.4149254135), (-25.5016, 19.0267674625))
            Line((-25.5016, 19.0267674625), (-25.4, 19.1283674625))
            ThreePointArc((-25.4, 19.1283674625), (-22.788157951, 19.1283674625), (-20.1763159021, 19.2720515604))
            Line((-20.1763159021, 19.2720515604), (-20.1763159021, 19.1704515604))
        make_face()
    extrude(amount=-F2_T207_DEPTH)

    split(bisect_by=Plane.YZ.offset(-13.1723778322), keep=Keep.TOP)


with BuildPart() as f2_tool201_1:
    add(f2_tool201.part)

    # F2_t209: intersect F2_tool205
    add(f2_tool205.part, mode=Mode.INTERSECT)


with BuildPart() as f1_24:
    add(f1_23.part)

    # F2_t199: cut F2_tool201
    add(f2_tool201_1.part, mode=Mode.SUBTRACT)

    # F3 (on Front) → F4 (join)
    with BuildSketch(Plane.XZ):
        Polygon((-28.458841145, 0), (-28.458841145, -20.3277431428), (-17.4005478621, -19.6772571653), (-17.4005478621, 0), align=None)
        with Locations((-20.4059630632, -8.7298303843)):
            Circle(F3_R, mode=Mode.SUBTRACT)
    extrude(amount=F4_DEPTH)


solid = f1_24.part
